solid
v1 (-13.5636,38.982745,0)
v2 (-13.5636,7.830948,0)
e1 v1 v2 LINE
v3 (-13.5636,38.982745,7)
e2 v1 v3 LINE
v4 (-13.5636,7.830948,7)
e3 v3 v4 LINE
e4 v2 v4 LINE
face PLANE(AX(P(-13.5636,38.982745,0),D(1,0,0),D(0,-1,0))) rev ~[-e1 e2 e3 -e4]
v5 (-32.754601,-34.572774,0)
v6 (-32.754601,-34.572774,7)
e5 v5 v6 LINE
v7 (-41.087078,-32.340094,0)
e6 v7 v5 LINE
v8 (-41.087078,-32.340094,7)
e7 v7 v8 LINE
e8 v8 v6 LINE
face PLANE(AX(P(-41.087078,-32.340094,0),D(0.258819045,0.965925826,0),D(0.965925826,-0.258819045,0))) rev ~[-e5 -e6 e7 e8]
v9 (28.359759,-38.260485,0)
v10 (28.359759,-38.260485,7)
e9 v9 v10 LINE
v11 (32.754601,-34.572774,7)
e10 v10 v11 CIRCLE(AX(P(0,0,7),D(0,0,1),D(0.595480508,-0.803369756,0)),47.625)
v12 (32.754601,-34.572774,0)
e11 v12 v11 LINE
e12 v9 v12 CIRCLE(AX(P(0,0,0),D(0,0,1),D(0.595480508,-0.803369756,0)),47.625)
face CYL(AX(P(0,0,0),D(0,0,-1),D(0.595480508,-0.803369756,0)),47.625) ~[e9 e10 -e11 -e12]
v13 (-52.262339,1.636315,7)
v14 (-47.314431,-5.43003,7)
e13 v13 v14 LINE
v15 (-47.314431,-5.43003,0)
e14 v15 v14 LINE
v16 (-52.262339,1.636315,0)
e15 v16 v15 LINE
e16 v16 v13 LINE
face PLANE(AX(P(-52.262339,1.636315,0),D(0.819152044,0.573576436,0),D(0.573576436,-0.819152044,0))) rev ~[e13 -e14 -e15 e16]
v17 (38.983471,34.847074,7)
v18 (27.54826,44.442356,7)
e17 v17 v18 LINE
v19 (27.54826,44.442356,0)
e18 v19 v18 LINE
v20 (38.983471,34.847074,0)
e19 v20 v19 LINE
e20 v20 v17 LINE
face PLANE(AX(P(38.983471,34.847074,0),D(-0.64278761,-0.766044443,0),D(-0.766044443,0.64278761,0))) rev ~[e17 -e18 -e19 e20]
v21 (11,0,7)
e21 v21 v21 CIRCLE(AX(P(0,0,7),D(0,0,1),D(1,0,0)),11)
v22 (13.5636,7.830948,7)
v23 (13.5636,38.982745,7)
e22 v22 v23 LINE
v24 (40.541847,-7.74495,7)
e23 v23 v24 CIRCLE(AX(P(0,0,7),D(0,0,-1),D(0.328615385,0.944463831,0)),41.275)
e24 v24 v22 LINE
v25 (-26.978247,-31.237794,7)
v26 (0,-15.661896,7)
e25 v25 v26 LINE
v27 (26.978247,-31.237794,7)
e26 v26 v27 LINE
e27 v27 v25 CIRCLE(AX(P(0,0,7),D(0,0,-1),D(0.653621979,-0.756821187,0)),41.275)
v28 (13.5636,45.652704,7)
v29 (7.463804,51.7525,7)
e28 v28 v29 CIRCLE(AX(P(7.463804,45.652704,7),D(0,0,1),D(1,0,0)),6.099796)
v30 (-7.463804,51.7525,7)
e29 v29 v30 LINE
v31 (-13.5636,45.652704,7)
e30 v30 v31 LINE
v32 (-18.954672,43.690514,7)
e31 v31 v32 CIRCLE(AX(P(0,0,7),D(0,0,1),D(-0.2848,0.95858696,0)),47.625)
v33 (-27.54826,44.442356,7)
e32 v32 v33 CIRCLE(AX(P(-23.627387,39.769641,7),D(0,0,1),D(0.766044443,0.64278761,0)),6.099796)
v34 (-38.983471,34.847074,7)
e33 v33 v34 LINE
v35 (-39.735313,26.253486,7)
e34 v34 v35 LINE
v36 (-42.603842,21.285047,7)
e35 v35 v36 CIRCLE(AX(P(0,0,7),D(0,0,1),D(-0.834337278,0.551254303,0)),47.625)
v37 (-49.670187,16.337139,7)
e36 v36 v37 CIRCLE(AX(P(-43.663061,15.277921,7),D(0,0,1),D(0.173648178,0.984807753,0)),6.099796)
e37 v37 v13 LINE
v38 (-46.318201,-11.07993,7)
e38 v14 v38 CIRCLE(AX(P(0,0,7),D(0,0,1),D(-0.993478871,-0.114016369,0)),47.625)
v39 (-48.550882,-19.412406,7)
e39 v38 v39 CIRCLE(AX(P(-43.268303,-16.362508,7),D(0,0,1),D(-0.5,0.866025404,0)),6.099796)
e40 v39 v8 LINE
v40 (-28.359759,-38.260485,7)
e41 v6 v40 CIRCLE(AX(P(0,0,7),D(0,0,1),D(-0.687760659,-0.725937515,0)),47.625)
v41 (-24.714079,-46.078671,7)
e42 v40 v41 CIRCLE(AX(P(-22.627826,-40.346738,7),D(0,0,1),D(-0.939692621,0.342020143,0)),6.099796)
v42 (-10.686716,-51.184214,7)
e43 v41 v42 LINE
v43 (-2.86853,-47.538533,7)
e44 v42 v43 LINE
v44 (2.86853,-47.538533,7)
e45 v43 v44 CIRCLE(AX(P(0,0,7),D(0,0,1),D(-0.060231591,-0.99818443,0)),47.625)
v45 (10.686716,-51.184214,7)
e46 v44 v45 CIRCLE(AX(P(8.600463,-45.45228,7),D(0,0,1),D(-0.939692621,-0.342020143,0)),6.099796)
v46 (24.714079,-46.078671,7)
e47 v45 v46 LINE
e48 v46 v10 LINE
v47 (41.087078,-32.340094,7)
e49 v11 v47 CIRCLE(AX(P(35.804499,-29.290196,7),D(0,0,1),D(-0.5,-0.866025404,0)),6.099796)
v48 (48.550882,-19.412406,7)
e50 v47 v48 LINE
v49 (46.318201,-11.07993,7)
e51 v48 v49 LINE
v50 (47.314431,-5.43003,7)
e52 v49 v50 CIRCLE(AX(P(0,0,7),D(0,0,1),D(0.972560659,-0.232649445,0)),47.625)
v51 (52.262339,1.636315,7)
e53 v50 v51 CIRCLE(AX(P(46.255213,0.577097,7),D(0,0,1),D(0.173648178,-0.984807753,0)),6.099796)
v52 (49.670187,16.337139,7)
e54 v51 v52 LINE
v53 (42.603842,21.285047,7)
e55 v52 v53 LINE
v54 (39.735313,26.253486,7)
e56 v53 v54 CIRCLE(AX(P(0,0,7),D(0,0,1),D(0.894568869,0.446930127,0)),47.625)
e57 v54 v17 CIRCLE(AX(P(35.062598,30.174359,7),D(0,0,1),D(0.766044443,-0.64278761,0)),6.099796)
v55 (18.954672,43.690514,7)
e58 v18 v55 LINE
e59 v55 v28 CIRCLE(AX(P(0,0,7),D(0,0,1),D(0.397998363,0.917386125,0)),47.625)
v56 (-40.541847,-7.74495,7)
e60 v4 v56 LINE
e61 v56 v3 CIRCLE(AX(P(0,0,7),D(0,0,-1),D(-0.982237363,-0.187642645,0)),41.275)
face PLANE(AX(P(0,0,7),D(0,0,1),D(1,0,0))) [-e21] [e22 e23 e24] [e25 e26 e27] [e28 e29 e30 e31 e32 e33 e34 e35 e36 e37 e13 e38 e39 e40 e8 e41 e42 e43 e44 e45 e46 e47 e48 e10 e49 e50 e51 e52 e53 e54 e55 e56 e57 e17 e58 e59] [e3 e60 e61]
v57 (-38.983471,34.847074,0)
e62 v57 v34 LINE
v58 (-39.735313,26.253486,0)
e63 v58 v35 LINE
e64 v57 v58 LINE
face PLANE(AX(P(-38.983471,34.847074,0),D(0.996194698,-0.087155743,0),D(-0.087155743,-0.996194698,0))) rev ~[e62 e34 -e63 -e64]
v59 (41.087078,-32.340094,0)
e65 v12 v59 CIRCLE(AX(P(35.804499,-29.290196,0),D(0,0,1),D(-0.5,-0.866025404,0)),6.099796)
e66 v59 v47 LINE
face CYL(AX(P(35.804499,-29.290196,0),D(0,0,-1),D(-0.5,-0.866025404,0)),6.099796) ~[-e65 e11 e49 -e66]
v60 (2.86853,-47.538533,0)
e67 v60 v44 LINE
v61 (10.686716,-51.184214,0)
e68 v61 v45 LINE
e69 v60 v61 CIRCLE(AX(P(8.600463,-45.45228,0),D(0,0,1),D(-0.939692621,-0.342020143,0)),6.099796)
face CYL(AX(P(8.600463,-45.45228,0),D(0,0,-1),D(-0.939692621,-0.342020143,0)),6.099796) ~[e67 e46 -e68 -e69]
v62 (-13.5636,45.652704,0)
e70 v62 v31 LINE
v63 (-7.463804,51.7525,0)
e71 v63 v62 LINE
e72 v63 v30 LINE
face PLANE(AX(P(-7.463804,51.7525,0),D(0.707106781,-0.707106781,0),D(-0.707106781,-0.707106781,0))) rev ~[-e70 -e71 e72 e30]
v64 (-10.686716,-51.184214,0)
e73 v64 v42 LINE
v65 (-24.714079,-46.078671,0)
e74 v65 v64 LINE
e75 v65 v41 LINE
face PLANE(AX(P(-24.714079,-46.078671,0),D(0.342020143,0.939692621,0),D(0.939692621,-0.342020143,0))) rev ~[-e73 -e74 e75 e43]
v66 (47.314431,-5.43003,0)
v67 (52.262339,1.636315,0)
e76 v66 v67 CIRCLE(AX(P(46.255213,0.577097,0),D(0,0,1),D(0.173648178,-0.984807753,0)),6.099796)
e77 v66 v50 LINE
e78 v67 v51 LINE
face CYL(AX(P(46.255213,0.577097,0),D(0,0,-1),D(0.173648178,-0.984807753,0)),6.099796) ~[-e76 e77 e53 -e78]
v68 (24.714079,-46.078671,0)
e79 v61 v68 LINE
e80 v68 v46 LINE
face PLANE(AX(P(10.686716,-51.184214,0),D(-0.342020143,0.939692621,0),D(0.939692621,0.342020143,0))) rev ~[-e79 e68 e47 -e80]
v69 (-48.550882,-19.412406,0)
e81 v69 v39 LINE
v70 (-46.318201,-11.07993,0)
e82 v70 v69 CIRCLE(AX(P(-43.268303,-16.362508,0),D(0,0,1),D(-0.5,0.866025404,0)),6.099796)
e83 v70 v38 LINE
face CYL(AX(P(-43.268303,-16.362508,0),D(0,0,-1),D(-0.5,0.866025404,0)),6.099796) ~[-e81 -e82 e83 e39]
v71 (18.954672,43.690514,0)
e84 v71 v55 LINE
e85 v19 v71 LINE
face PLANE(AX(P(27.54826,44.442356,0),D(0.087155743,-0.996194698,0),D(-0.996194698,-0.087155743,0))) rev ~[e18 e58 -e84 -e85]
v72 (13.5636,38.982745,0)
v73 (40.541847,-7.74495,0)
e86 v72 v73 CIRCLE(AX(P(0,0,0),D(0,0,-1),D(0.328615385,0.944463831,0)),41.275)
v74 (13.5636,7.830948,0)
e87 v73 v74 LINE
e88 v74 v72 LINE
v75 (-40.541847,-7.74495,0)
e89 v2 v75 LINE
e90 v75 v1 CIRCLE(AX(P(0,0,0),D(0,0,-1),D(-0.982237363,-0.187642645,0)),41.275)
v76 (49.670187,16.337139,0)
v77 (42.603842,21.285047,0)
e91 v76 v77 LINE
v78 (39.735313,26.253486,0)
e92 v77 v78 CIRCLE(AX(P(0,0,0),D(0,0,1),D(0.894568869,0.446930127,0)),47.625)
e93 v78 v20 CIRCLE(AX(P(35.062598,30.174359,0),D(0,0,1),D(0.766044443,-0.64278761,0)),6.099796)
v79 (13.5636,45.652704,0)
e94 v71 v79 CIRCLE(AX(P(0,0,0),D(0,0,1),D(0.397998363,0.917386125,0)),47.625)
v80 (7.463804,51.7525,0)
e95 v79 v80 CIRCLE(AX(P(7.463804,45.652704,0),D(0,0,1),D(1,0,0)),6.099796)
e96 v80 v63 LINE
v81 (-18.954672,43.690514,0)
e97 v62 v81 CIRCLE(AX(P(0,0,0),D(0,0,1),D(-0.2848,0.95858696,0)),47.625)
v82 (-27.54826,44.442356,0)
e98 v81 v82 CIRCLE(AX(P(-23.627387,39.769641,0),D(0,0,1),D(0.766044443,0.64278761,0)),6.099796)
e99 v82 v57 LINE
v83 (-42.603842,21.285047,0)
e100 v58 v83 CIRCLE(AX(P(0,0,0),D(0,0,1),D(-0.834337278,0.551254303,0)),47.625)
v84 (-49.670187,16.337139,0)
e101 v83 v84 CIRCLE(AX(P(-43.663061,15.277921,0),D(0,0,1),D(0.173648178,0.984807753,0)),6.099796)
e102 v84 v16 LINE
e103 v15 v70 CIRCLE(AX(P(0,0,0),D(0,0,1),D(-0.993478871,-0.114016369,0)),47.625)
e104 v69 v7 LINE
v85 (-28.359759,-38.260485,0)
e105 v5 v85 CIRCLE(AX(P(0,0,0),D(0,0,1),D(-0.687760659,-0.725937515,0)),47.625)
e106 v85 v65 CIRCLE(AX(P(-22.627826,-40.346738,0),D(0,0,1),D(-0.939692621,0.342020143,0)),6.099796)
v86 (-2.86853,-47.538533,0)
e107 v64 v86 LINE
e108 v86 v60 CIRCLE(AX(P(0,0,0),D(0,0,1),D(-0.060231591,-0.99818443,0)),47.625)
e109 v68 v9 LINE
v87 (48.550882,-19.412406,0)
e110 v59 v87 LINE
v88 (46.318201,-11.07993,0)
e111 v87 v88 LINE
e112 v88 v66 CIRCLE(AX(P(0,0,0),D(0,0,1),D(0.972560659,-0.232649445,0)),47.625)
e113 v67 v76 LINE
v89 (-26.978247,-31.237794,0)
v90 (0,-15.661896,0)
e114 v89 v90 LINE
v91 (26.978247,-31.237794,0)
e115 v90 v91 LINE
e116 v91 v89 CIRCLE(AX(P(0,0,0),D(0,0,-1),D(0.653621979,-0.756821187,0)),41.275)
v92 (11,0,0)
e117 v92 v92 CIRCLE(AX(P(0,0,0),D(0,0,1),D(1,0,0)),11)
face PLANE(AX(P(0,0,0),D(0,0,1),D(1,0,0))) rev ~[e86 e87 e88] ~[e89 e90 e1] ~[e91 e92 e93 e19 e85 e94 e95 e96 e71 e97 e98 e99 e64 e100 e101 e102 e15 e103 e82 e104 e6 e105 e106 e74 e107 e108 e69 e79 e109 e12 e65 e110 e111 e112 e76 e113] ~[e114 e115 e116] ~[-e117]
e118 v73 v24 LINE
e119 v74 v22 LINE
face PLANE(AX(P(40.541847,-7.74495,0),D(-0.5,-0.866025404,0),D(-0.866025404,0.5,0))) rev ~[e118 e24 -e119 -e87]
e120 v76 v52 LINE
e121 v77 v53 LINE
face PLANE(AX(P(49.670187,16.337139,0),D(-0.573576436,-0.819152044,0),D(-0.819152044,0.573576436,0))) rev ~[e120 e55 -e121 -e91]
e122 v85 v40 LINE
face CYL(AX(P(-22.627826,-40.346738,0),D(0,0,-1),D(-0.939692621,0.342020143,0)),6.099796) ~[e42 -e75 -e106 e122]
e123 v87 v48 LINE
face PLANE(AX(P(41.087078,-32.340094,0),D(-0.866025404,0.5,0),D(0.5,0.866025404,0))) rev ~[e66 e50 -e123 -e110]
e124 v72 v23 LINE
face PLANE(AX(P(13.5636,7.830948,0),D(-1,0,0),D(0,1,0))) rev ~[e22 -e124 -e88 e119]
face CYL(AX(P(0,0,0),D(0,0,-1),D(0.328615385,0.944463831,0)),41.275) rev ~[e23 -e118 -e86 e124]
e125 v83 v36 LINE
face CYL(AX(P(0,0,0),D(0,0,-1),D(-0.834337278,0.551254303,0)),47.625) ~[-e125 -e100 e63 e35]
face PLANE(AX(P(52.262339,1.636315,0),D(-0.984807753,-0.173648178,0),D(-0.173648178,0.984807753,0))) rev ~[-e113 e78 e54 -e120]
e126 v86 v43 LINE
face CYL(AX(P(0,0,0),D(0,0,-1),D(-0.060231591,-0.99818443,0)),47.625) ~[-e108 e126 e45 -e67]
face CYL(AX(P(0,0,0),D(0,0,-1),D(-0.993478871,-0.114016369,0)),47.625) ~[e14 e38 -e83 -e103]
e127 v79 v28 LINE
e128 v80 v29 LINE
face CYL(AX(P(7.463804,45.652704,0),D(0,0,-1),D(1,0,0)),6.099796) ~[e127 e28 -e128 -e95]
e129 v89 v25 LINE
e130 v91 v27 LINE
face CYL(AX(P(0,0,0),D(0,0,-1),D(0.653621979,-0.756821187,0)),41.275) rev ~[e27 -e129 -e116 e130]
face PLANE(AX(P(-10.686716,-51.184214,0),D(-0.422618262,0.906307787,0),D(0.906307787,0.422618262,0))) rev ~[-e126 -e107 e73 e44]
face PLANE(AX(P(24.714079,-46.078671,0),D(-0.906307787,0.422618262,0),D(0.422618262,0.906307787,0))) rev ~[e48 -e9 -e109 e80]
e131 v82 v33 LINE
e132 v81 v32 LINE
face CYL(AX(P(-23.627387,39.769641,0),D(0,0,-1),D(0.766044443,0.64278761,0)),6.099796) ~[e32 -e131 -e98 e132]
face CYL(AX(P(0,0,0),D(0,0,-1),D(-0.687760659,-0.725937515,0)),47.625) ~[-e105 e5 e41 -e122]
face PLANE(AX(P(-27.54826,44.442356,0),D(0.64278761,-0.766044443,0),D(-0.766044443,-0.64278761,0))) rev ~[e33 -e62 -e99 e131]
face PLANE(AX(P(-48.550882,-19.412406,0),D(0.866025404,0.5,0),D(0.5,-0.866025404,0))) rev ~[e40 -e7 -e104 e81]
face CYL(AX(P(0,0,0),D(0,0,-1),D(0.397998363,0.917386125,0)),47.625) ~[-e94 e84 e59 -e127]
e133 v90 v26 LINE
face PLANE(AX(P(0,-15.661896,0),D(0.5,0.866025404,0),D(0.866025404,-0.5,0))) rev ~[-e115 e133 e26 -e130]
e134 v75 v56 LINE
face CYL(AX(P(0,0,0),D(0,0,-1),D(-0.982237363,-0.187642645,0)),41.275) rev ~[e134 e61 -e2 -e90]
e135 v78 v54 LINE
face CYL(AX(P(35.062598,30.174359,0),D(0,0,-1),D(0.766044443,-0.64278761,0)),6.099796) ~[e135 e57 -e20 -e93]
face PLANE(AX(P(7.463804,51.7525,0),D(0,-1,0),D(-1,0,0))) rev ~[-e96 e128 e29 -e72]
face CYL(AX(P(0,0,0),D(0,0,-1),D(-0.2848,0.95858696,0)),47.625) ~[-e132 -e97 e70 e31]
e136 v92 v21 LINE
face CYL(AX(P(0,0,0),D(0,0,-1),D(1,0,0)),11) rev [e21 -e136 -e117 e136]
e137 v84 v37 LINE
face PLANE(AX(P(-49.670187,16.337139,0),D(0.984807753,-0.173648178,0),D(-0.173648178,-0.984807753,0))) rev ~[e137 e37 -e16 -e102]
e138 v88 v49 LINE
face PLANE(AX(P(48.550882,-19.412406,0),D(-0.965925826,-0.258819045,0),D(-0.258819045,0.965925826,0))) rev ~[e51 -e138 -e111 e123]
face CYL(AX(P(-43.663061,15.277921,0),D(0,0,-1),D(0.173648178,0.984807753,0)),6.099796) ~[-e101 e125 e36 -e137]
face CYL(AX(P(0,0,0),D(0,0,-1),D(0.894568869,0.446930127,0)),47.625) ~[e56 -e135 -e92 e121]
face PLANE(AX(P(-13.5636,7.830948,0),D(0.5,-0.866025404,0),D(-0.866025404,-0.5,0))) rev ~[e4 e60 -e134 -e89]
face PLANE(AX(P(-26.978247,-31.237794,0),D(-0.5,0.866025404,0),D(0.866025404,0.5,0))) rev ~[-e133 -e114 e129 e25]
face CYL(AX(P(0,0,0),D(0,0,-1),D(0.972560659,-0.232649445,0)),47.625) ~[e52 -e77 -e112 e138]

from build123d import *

# Parameters (mm, degrees)
F0_R     = 13.5636
F0_R_2   = 11
F1_DEPTH = 7


# Not quite as in the source:
# - a feature names something its author has since deleted; it is built from what else it names


with BuildPart() as f1:
    # F0 (on Top) → F1 (new body)
    with BuildSketch(Plane.XY):
        with BuildLine():
            Line((-7.4638039729, 51.7525), (-13.5636, 45.6527039729))
            ThreePointArc((-13.5636, 45.6527039729), (-16.2887093259, 44.7528610649), (-18.9546720538, 43.6905142146))
            ThreePointArc((-18.9546720538, 43.6905142146), (-23.0957546511, 45.8462253684), (-27.5482602123, 44.4423557574))
            Line((-27.5482602123, 44.4423557574), (-38.9834713283, 34.8470743276))
            Line((-38.9834713283, 34.8470743276), (-39.7353128712, 26.2534861691))
            ThreePointArc((-39.7353128712, 26.2534861691), (-41.2444598552, 23.8125), (-42.6038423959, 21.2850472892))
            ThreePointArc((-42.6038423959, 21.2850472892), (-47.1617601278, 20.2745812553), (-49.6701872794, 16.3371393342))
            Line((-49.6701872794, 16.3371393342), (-52.2623391961, 1.6363152952))
            Line((-52.2623391961, 1.6363152952), (-47.3144312411, -5.4300295883))
            ThreePointArc((-47.3144312411, -5.4300295883), (-46.9014692372, -8.2699944614), (-46.318201392, -11.0799298197))
            ThreePointArc((-46.318201392, -11.0799298197), (-49.1602538961, -14.783764754), (-48.5508816958, -19.4124061506))
            Line((-48.5508816958, -19.4124061506), (-41.0870777229, -32.3400938494))
            Line((-41.0870777229, -32.3400938494), (-32.754601392, -34.5727741532))
            ThreePointArc((-32.754601392, -34.5727741532), (-30.6127599113, -36.4828666035), (-28.3597591873, -38.2604846263))
            ThreePointArc((-28.3597591873, -38.2604846263), (-28.156118511, -42.9246229316), (-24.7140789838, -46.0786710526))
            Line((-24.7140789838, -46.0786710526), (-10.6867159511, -51.1842136618))
            Line((-10.6867159511, -51.1842136618), (-2.8685295247, -47.5385334583))
            ThreePointArc((-2.8685295247, -47.5385334583), (0, -47.625), (2.8685295247, -47.5385334583))
            ThreePointArc((2.8685295247, -47.5385334583), (6.0225776457, -50.9805729855), (10.6867159511, -51.1842136618))
            Line((10.6867159511, -51.1842136618), (24.7140789838, -46.0786710526))
            Line((24.7140789838, -46.0786710526), (28.3597591873, -38.2604846263))
            ThreePointArc((28.3597591873, -38.2604846263), (30.6127599113, -36.4828666035), (32.754601392, -34.5727741532))
            ThreePointArc((32.754601392, -34.5727741532), (37.3832427886, -35.1821463535), (41.0870777229, -32.3400938494))
            Line((41.0870777229, -32.3400938494), (48.5508816958, -19.4124061506))
            Line((48.5508816958, -19.4124061506), (46.318201392, -11.0799298197))
            ThreePointArc((46.318201392, -11.0799298197), (46.9014692372, -8.2699944614), (47.3144312411, -5.4300295883))
            ThreePointArc((47.3144312411, -5.4300295883), (51.2518731622, -2.9216024367), (52.2623391961, 1.6363152952))
            Line((52.2623391961, 1.6363152952), (49.6701872794, 16.3371393342))
            Line((49.6701872794, 16.3371393342), (42.6038423959, 21.2850472892))
            ThreePointArc((42.6038423959, 21.2850472892), (41.2444598552, 23.8125), (39.7353128712, 26.2534861691))
            ThreePointArc((39.7353128712, 26.2534861691), (41.1391824821, 30.7059917302), (38.9834713283, 34.8470743276))
            Line((38.9834713283, 34.8470743276), (27.5482602123, 44.4423557574))
            Line((27.5482602123, 44.4423557574), (18.9546720538, 43.6905142146))
            ThreePointArc((18.9546720538, 43.6905142146), (16.2887093259, 44.7528610649), (13.5636, 45.6527039729))
            ThreePointArc((13.5636, 45.6527039729), (11.7770111075, 49.9659111075), (7.4638039729, 51.7525))
            Line((7.4638039729, 51.7525), (-7.4638039729, 51.7525))
        make_face()
        with BuildLine():
            ThreePointArc((26.9782471716, -31.2377944892), (0, -41.275), (-26.9782471716, -31.2377944892))
            Line((-26.9782471716, -31.2377944892), (0, -15.6618962224))
            Line((0, -15.6618962224), (26.9782471716, -31.2377944892))
        make_face(mode=Mode.SUBTRACT)
        Circle(F0_R, mode=Mode.SUBTRACT)
        with BuildLine():
            ThreePointArc((-40.5418471716, -7.7449501556), (-35.7451985412, 20.6375), (-13.5636, 38.9827446448))
            Line((-13.5636, 38.9827446448), (-13.5636, 7.8309481112))
            Line((-13.5636, 7.8309481112), (-40.5418471716, -7.7449501556))
        make_face(mode=Mode.SUBTRACT)
        with BuildLine():
            ThreePointArc((13.5636, 38.9827446448), (35.7451985412, 20.6375), (40.5418471716, -7.7449501556))
            Line((40.5418471716, -7.7449501556), (13.5636, 7.8309481112))
            Line((13.5636, 7.8309481112), (13.5636, 38.9827446448))
        make_face(mode=Mode.SUBTRACT)
        Circle(F0_R)
        Circle(F0_R_2, mode=Mode.SUBTRACT)
    extrude(amount=F1_DEPTH)


solid = f1.part
